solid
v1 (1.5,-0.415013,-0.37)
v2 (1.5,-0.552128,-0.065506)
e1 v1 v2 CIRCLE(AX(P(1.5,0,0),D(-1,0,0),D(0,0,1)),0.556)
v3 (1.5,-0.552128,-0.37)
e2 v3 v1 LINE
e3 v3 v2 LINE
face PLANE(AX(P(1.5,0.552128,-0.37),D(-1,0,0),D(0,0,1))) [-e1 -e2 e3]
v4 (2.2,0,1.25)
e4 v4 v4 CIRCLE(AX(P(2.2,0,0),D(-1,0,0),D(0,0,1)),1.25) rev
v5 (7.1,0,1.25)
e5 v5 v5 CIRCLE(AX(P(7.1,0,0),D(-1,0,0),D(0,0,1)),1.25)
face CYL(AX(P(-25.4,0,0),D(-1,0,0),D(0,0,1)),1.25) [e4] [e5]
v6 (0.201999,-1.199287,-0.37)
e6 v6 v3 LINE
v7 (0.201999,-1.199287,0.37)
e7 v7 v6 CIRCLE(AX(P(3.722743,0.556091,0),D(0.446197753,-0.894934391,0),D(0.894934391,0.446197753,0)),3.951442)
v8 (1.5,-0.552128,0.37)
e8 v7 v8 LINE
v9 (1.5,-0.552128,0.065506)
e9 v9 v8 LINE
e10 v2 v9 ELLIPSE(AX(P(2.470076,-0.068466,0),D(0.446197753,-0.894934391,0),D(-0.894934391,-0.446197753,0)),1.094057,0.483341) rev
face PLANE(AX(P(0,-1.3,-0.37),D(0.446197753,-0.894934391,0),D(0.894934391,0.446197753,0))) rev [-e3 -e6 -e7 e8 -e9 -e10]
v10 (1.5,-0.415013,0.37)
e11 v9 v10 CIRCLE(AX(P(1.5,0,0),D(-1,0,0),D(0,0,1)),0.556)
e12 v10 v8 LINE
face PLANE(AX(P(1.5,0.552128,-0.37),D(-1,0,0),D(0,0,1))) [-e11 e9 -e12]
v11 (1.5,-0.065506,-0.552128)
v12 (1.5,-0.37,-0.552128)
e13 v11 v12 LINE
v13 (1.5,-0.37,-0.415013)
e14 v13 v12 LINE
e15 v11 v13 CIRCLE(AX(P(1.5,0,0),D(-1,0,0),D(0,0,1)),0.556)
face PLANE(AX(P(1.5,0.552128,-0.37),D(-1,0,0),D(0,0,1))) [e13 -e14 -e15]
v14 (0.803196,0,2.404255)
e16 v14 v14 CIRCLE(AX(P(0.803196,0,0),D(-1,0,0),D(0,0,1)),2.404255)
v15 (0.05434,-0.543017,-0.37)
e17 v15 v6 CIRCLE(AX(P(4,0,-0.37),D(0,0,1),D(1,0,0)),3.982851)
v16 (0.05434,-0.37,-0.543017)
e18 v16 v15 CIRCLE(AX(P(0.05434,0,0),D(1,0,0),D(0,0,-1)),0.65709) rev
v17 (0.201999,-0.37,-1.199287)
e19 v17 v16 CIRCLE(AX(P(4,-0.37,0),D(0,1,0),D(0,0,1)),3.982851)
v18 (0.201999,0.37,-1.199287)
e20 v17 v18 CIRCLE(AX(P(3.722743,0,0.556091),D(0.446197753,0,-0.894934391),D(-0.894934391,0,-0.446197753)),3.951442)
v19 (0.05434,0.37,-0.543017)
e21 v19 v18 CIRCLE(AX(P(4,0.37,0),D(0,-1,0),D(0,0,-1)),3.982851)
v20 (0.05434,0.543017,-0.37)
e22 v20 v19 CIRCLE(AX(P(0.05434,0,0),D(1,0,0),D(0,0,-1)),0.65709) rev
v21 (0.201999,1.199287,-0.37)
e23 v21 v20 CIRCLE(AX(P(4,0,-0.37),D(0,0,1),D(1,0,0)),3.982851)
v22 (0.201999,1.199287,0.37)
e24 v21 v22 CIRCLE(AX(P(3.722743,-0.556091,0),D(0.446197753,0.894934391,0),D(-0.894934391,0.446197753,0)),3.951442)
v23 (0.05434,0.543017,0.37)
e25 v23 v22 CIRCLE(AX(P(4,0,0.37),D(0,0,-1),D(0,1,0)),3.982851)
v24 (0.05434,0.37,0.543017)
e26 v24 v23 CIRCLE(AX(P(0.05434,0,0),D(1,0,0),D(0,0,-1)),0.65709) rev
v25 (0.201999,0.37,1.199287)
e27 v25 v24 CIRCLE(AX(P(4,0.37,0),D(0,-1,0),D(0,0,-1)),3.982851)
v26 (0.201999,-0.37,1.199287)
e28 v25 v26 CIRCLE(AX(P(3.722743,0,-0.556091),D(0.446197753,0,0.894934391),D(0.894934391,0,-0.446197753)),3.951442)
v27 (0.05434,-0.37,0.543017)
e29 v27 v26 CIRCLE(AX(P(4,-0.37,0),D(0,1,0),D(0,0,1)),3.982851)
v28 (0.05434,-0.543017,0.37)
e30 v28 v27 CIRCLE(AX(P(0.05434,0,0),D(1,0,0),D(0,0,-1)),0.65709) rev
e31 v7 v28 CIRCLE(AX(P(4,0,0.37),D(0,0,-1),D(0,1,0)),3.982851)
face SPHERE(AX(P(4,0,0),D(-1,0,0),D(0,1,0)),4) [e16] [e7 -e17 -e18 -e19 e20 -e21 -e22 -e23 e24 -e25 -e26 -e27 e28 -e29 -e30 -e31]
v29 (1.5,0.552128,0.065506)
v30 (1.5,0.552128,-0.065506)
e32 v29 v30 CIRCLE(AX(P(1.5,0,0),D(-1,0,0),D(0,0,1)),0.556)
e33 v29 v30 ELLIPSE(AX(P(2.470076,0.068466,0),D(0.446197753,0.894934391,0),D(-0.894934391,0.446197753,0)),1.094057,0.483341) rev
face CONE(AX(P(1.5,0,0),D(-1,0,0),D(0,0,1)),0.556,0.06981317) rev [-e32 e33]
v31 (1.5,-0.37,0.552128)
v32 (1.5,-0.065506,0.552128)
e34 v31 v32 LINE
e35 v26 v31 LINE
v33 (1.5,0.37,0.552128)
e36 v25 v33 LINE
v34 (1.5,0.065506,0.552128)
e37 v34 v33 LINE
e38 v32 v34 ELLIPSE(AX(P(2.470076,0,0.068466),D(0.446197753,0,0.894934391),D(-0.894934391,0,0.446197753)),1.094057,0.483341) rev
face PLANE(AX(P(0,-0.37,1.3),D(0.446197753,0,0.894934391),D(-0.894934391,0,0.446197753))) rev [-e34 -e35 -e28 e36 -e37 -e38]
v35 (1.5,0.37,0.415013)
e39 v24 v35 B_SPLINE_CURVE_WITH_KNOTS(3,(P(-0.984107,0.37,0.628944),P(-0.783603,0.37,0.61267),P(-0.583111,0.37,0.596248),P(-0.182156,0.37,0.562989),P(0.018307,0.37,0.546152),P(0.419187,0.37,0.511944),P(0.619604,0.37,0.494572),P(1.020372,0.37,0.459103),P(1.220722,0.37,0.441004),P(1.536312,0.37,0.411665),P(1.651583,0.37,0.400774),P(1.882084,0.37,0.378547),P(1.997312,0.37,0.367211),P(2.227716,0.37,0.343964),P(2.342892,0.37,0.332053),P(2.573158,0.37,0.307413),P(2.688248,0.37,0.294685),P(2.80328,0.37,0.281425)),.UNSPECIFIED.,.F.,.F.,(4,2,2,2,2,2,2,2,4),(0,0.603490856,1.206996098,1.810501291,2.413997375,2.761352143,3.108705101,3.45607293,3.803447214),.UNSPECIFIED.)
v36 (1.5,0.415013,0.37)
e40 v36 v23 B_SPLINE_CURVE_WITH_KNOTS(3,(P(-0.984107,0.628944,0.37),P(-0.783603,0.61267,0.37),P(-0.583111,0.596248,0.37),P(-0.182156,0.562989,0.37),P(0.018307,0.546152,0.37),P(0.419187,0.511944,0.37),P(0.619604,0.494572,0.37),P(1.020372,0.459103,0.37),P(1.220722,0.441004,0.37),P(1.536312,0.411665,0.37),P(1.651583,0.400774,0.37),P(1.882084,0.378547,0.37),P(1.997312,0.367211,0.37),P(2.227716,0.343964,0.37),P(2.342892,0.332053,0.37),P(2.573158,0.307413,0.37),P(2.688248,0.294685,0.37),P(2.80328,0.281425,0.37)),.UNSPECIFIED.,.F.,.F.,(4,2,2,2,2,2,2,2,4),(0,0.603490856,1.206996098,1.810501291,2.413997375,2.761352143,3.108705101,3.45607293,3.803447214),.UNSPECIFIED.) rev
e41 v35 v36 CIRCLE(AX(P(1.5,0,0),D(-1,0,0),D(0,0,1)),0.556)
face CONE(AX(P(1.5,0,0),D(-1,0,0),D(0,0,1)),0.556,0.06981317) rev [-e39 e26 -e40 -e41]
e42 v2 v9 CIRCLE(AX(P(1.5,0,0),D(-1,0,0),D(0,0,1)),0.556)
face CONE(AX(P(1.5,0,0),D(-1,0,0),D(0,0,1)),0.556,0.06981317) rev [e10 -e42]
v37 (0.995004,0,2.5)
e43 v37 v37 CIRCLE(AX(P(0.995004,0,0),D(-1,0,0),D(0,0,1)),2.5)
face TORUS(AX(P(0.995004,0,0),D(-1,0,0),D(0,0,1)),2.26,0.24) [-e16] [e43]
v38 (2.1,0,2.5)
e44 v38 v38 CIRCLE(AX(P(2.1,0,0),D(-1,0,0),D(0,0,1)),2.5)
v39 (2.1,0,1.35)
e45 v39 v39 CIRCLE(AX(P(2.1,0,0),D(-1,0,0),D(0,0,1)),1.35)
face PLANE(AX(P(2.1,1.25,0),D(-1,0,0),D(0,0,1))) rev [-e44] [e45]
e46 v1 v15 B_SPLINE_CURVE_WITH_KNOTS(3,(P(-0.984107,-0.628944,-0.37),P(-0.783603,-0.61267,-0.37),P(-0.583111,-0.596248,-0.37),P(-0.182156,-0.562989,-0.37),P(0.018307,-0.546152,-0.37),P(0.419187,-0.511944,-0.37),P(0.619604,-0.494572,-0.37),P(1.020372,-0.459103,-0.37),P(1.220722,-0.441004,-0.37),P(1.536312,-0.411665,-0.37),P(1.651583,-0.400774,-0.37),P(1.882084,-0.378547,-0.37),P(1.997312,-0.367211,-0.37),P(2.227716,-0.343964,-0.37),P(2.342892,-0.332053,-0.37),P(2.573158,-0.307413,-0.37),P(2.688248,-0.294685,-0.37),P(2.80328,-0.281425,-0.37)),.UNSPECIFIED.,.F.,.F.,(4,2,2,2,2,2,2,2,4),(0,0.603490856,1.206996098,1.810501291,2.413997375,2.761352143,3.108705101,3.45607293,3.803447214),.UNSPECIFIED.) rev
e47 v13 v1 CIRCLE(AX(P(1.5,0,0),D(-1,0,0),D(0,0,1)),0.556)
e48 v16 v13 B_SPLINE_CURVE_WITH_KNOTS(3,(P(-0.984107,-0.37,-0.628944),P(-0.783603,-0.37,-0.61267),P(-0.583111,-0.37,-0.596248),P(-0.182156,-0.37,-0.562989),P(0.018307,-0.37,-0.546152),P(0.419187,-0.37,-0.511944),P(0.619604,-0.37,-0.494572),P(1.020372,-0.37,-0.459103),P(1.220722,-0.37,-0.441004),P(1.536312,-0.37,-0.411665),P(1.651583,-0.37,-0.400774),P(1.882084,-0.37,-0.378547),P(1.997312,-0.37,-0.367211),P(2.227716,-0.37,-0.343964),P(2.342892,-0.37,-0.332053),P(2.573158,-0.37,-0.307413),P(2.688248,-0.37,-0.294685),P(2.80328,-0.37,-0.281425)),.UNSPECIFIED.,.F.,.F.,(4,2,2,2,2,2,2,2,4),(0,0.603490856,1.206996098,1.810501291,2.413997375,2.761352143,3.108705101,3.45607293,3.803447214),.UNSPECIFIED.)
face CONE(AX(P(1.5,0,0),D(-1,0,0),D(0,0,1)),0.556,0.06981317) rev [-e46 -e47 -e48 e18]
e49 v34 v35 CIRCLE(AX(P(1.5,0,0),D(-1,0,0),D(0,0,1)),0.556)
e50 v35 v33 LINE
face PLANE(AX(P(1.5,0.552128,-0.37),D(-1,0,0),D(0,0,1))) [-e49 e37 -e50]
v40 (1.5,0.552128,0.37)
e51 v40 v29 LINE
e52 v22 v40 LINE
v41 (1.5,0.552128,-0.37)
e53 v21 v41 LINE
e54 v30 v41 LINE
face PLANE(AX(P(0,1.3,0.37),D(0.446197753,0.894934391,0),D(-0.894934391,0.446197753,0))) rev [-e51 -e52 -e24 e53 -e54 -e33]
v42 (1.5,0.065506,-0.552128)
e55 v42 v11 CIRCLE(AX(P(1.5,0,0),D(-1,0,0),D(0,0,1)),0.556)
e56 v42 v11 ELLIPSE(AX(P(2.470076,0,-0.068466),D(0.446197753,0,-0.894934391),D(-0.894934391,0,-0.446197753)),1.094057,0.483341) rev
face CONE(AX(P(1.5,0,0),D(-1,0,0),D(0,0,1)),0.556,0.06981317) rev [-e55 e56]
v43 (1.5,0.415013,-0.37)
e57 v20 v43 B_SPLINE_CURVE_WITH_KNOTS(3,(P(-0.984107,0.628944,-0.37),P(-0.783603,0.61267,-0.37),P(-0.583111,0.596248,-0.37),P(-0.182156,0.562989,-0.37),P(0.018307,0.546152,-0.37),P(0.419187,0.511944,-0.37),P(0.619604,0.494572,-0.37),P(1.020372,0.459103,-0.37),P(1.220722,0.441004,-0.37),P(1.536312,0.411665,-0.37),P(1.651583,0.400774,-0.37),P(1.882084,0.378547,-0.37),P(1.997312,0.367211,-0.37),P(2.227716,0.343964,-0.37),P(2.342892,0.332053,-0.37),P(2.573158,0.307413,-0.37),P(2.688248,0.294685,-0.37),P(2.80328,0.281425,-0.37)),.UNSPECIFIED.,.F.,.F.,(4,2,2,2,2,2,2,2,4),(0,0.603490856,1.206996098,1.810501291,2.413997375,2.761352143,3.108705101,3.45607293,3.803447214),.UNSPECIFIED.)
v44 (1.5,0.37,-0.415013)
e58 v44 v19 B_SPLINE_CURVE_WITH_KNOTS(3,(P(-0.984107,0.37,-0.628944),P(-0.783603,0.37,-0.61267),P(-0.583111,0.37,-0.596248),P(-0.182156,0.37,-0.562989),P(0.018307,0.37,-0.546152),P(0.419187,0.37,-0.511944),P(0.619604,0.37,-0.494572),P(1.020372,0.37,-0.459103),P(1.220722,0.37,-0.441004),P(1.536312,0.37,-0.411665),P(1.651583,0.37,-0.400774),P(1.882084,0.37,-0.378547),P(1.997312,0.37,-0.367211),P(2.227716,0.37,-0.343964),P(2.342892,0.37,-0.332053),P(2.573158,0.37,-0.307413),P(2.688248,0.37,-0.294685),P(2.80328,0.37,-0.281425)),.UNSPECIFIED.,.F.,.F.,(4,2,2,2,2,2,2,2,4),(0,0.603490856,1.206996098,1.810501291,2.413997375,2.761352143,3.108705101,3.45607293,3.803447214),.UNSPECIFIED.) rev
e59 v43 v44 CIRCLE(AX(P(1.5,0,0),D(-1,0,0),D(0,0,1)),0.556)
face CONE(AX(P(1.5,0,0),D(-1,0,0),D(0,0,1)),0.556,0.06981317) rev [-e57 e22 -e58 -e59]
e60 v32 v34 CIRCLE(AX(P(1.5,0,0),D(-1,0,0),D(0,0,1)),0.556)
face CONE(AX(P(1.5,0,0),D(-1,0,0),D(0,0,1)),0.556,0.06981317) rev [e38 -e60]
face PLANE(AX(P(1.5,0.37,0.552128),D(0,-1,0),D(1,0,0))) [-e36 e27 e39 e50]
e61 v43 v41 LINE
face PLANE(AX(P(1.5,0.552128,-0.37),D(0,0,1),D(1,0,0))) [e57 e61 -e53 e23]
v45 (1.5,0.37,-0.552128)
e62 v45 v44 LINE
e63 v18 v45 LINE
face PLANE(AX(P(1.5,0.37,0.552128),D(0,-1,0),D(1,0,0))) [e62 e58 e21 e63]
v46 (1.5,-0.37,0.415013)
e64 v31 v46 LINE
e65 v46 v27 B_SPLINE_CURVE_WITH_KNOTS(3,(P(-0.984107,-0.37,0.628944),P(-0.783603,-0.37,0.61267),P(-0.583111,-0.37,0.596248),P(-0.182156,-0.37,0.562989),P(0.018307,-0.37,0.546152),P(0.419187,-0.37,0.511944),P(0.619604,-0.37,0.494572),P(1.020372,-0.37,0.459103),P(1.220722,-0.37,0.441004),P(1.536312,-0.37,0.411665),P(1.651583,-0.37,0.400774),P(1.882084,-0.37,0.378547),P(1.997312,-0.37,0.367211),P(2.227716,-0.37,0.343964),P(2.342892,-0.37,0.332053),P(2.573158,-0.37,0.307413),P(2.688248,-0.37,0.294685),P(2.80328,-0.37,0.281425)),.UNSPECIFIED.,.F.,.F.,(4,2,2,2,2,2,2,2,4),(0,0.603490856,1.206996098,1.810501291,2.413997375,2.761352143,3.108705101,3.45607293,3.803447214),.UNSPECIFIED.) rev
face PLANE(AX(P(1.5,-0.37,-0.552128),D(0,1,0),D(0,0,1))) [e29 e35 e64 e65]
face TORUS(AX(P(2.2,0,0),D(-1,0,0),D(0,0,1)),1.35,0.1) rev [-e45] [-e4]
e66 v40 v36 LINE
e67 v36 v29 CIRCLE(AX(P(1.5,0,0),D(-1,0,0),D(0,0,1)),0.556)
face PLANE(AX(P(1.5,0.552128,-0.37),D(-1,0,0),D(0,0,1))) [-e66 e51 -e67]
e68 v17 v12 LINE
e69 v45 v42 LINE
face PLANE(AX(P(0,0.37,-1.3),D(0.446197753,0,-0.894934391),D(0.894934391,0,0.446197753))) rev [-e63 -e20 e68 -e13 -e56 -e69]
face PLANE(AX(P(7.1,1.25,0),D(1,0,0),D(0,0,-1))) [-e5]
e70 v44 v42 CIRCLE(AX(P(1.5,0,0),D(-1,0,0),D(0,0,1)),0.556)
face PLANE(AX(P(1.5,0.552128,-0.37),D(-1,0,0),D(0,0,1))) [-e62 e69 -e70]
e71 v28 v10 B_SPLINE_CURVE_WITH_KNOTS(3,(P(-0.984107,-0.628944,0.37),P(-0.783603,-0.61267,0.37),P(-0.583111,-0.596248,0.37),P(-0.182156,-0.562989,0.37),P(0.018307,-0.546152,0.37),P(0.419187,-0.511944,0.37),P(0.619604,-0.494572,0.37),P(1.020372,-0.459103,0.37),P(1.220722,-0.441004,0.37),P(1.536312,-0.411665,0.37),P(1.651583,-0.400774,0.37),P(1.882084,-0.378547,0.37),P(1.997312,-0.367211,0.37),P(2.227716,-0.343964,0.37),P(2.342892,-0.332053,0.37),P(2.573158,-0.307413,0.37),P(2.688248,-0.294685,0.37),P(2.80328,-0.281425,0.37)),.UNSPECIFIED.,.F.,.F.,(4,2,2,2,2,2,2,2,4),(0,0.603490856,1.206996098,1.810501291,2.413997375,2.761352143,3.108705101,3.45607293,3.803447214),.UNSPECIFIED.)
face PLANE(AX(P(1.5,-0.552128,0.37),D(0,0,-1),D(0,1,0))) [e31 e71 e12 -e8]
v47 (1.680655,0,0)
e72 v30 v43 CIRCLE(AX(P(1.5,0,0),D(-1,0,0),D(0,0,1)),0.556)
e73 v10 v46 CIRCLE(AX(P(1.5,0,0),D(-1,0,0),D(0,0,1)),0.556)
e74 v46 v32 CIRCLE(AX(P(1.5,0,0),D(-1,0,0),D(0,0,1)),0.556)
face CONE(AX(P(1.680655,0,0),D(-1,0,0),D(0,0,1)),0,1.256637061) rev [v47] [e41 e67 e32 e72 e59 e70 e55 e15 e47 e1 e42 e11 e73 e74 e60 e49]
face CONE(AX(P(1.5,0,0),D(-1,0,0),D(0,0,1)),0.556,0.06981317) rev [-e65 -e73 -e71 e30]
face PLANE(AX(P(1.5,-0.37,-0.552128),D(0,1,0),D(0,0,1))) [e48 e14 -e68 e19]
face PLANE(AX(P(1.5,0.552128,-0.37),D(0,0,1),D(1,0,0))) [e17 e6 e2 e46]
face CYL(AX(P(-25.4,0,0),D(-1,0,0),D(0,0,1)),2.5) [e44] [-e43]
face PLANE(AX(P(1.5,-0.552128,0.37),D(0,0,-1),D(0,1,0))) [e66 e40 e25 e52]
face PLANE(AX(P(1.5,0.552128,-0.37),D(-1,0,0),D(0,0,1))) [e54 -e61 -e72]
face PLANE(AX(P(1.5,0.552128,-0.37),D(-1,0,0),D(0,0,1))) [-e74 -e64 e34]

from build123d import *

# Parameters (mm, degrees)
RECPAT_COUNT = 2
RECPAT_ANGLE = 90


with BuildPart() as part:
    # Fillet1: read off the stored shape, not the designer's step
    # Fillet1 outline → Fillet1 (revolve)
    with BuildSketch(Plane.YX):
        with BuildLine():
            Line((1.25, 2.2), (1.25, 7.1))
            Line((1.25, 7.1), (0, 7.1))
            Line((0, 7.1), (0, 0))
            ThreePointArc((0, 0), (1.267435139, 0.206109099), (2.404255321, 0.803195916))
            ThreePointArc((2.404255321, 0.803195916), (2.474733878, 0.88781572), (2.5, 0.99500416))
            Line((2.5, 0.99500416), (2.5, 2.1))
            Line((2.5, 2.1), (1.35, 2.1))
            ThreePointArc((1.35, 2.1), (1.279289322, 2.129289322), (1.25, 2.2))
        make_face()
    revolve(axis=Axis((0, 0, 0), (1, 0, 0)))

    # Sketch3 → Recess section 0
    with BuildSketch(Plane(origin=(0, 0, 0), x_dir=(0, 0, -1), z_dir=(1, 0, 0))):
        with BuildLine():
            Line((0.37, -1.3), (-0.37, -1.3))
            Line((-0.37, -1.3), (-0.37, 1.3))
            Line((-0.37, 1.3), (0.37, 1.3))
            Line((0.37, 1.3), (0.37, -1.3))
        make_face()
    # Sketch4 → Recess section 1
    with BuildSketch(Plane(origin=(1.5, 0, 0), x_dir=(0, 0, -1), z_dir=(1, 0, 0))):
        with BuildLine():
            Line((0.37, -0.552127713), (-0.37, -0.552127713))
            Line((-0.37, -0.552127713), (-0.37, 0.552127713))
            Line((-0.37, 0.552127713), (0.37, 0.552127713))
            Line((0.37, 0.552127713), (0.37, -0.552127713))
        make_face()
    recess = loft(mode=Mode.SUBTRACT)

    # RecPat: Recess ×2 about axis
    recpat_axis = Axis((0, 0, 0), (1, 0, 0))
    for i in range(1, RECPAT_COUNT):
        add(recess.rotate(recpat_axis, i * RECPAT_ANGLE / (RECPAT_COUNT - 1)), mode=Mode.SUBTRACT)

    # RecCorSke → RecessCore (revolve, cut)
    with BuildSketch(Plane.XY, mode=Mode.PRIVATE) as recesscore_sk:
        Polygon((0, 0), (0, 0.660890218), (1.5, 0.556), (1.680655351, 0), align=None)
    revolve(recesscore_sk.sketch.rotate(Axis((-3.175, 0, 0), (1, 0, 0)), 90), axis=Axis((-3.175, 0, 0), (1, 0, 0)), mode=Mode.SUBTRACT)


solid = part.part
